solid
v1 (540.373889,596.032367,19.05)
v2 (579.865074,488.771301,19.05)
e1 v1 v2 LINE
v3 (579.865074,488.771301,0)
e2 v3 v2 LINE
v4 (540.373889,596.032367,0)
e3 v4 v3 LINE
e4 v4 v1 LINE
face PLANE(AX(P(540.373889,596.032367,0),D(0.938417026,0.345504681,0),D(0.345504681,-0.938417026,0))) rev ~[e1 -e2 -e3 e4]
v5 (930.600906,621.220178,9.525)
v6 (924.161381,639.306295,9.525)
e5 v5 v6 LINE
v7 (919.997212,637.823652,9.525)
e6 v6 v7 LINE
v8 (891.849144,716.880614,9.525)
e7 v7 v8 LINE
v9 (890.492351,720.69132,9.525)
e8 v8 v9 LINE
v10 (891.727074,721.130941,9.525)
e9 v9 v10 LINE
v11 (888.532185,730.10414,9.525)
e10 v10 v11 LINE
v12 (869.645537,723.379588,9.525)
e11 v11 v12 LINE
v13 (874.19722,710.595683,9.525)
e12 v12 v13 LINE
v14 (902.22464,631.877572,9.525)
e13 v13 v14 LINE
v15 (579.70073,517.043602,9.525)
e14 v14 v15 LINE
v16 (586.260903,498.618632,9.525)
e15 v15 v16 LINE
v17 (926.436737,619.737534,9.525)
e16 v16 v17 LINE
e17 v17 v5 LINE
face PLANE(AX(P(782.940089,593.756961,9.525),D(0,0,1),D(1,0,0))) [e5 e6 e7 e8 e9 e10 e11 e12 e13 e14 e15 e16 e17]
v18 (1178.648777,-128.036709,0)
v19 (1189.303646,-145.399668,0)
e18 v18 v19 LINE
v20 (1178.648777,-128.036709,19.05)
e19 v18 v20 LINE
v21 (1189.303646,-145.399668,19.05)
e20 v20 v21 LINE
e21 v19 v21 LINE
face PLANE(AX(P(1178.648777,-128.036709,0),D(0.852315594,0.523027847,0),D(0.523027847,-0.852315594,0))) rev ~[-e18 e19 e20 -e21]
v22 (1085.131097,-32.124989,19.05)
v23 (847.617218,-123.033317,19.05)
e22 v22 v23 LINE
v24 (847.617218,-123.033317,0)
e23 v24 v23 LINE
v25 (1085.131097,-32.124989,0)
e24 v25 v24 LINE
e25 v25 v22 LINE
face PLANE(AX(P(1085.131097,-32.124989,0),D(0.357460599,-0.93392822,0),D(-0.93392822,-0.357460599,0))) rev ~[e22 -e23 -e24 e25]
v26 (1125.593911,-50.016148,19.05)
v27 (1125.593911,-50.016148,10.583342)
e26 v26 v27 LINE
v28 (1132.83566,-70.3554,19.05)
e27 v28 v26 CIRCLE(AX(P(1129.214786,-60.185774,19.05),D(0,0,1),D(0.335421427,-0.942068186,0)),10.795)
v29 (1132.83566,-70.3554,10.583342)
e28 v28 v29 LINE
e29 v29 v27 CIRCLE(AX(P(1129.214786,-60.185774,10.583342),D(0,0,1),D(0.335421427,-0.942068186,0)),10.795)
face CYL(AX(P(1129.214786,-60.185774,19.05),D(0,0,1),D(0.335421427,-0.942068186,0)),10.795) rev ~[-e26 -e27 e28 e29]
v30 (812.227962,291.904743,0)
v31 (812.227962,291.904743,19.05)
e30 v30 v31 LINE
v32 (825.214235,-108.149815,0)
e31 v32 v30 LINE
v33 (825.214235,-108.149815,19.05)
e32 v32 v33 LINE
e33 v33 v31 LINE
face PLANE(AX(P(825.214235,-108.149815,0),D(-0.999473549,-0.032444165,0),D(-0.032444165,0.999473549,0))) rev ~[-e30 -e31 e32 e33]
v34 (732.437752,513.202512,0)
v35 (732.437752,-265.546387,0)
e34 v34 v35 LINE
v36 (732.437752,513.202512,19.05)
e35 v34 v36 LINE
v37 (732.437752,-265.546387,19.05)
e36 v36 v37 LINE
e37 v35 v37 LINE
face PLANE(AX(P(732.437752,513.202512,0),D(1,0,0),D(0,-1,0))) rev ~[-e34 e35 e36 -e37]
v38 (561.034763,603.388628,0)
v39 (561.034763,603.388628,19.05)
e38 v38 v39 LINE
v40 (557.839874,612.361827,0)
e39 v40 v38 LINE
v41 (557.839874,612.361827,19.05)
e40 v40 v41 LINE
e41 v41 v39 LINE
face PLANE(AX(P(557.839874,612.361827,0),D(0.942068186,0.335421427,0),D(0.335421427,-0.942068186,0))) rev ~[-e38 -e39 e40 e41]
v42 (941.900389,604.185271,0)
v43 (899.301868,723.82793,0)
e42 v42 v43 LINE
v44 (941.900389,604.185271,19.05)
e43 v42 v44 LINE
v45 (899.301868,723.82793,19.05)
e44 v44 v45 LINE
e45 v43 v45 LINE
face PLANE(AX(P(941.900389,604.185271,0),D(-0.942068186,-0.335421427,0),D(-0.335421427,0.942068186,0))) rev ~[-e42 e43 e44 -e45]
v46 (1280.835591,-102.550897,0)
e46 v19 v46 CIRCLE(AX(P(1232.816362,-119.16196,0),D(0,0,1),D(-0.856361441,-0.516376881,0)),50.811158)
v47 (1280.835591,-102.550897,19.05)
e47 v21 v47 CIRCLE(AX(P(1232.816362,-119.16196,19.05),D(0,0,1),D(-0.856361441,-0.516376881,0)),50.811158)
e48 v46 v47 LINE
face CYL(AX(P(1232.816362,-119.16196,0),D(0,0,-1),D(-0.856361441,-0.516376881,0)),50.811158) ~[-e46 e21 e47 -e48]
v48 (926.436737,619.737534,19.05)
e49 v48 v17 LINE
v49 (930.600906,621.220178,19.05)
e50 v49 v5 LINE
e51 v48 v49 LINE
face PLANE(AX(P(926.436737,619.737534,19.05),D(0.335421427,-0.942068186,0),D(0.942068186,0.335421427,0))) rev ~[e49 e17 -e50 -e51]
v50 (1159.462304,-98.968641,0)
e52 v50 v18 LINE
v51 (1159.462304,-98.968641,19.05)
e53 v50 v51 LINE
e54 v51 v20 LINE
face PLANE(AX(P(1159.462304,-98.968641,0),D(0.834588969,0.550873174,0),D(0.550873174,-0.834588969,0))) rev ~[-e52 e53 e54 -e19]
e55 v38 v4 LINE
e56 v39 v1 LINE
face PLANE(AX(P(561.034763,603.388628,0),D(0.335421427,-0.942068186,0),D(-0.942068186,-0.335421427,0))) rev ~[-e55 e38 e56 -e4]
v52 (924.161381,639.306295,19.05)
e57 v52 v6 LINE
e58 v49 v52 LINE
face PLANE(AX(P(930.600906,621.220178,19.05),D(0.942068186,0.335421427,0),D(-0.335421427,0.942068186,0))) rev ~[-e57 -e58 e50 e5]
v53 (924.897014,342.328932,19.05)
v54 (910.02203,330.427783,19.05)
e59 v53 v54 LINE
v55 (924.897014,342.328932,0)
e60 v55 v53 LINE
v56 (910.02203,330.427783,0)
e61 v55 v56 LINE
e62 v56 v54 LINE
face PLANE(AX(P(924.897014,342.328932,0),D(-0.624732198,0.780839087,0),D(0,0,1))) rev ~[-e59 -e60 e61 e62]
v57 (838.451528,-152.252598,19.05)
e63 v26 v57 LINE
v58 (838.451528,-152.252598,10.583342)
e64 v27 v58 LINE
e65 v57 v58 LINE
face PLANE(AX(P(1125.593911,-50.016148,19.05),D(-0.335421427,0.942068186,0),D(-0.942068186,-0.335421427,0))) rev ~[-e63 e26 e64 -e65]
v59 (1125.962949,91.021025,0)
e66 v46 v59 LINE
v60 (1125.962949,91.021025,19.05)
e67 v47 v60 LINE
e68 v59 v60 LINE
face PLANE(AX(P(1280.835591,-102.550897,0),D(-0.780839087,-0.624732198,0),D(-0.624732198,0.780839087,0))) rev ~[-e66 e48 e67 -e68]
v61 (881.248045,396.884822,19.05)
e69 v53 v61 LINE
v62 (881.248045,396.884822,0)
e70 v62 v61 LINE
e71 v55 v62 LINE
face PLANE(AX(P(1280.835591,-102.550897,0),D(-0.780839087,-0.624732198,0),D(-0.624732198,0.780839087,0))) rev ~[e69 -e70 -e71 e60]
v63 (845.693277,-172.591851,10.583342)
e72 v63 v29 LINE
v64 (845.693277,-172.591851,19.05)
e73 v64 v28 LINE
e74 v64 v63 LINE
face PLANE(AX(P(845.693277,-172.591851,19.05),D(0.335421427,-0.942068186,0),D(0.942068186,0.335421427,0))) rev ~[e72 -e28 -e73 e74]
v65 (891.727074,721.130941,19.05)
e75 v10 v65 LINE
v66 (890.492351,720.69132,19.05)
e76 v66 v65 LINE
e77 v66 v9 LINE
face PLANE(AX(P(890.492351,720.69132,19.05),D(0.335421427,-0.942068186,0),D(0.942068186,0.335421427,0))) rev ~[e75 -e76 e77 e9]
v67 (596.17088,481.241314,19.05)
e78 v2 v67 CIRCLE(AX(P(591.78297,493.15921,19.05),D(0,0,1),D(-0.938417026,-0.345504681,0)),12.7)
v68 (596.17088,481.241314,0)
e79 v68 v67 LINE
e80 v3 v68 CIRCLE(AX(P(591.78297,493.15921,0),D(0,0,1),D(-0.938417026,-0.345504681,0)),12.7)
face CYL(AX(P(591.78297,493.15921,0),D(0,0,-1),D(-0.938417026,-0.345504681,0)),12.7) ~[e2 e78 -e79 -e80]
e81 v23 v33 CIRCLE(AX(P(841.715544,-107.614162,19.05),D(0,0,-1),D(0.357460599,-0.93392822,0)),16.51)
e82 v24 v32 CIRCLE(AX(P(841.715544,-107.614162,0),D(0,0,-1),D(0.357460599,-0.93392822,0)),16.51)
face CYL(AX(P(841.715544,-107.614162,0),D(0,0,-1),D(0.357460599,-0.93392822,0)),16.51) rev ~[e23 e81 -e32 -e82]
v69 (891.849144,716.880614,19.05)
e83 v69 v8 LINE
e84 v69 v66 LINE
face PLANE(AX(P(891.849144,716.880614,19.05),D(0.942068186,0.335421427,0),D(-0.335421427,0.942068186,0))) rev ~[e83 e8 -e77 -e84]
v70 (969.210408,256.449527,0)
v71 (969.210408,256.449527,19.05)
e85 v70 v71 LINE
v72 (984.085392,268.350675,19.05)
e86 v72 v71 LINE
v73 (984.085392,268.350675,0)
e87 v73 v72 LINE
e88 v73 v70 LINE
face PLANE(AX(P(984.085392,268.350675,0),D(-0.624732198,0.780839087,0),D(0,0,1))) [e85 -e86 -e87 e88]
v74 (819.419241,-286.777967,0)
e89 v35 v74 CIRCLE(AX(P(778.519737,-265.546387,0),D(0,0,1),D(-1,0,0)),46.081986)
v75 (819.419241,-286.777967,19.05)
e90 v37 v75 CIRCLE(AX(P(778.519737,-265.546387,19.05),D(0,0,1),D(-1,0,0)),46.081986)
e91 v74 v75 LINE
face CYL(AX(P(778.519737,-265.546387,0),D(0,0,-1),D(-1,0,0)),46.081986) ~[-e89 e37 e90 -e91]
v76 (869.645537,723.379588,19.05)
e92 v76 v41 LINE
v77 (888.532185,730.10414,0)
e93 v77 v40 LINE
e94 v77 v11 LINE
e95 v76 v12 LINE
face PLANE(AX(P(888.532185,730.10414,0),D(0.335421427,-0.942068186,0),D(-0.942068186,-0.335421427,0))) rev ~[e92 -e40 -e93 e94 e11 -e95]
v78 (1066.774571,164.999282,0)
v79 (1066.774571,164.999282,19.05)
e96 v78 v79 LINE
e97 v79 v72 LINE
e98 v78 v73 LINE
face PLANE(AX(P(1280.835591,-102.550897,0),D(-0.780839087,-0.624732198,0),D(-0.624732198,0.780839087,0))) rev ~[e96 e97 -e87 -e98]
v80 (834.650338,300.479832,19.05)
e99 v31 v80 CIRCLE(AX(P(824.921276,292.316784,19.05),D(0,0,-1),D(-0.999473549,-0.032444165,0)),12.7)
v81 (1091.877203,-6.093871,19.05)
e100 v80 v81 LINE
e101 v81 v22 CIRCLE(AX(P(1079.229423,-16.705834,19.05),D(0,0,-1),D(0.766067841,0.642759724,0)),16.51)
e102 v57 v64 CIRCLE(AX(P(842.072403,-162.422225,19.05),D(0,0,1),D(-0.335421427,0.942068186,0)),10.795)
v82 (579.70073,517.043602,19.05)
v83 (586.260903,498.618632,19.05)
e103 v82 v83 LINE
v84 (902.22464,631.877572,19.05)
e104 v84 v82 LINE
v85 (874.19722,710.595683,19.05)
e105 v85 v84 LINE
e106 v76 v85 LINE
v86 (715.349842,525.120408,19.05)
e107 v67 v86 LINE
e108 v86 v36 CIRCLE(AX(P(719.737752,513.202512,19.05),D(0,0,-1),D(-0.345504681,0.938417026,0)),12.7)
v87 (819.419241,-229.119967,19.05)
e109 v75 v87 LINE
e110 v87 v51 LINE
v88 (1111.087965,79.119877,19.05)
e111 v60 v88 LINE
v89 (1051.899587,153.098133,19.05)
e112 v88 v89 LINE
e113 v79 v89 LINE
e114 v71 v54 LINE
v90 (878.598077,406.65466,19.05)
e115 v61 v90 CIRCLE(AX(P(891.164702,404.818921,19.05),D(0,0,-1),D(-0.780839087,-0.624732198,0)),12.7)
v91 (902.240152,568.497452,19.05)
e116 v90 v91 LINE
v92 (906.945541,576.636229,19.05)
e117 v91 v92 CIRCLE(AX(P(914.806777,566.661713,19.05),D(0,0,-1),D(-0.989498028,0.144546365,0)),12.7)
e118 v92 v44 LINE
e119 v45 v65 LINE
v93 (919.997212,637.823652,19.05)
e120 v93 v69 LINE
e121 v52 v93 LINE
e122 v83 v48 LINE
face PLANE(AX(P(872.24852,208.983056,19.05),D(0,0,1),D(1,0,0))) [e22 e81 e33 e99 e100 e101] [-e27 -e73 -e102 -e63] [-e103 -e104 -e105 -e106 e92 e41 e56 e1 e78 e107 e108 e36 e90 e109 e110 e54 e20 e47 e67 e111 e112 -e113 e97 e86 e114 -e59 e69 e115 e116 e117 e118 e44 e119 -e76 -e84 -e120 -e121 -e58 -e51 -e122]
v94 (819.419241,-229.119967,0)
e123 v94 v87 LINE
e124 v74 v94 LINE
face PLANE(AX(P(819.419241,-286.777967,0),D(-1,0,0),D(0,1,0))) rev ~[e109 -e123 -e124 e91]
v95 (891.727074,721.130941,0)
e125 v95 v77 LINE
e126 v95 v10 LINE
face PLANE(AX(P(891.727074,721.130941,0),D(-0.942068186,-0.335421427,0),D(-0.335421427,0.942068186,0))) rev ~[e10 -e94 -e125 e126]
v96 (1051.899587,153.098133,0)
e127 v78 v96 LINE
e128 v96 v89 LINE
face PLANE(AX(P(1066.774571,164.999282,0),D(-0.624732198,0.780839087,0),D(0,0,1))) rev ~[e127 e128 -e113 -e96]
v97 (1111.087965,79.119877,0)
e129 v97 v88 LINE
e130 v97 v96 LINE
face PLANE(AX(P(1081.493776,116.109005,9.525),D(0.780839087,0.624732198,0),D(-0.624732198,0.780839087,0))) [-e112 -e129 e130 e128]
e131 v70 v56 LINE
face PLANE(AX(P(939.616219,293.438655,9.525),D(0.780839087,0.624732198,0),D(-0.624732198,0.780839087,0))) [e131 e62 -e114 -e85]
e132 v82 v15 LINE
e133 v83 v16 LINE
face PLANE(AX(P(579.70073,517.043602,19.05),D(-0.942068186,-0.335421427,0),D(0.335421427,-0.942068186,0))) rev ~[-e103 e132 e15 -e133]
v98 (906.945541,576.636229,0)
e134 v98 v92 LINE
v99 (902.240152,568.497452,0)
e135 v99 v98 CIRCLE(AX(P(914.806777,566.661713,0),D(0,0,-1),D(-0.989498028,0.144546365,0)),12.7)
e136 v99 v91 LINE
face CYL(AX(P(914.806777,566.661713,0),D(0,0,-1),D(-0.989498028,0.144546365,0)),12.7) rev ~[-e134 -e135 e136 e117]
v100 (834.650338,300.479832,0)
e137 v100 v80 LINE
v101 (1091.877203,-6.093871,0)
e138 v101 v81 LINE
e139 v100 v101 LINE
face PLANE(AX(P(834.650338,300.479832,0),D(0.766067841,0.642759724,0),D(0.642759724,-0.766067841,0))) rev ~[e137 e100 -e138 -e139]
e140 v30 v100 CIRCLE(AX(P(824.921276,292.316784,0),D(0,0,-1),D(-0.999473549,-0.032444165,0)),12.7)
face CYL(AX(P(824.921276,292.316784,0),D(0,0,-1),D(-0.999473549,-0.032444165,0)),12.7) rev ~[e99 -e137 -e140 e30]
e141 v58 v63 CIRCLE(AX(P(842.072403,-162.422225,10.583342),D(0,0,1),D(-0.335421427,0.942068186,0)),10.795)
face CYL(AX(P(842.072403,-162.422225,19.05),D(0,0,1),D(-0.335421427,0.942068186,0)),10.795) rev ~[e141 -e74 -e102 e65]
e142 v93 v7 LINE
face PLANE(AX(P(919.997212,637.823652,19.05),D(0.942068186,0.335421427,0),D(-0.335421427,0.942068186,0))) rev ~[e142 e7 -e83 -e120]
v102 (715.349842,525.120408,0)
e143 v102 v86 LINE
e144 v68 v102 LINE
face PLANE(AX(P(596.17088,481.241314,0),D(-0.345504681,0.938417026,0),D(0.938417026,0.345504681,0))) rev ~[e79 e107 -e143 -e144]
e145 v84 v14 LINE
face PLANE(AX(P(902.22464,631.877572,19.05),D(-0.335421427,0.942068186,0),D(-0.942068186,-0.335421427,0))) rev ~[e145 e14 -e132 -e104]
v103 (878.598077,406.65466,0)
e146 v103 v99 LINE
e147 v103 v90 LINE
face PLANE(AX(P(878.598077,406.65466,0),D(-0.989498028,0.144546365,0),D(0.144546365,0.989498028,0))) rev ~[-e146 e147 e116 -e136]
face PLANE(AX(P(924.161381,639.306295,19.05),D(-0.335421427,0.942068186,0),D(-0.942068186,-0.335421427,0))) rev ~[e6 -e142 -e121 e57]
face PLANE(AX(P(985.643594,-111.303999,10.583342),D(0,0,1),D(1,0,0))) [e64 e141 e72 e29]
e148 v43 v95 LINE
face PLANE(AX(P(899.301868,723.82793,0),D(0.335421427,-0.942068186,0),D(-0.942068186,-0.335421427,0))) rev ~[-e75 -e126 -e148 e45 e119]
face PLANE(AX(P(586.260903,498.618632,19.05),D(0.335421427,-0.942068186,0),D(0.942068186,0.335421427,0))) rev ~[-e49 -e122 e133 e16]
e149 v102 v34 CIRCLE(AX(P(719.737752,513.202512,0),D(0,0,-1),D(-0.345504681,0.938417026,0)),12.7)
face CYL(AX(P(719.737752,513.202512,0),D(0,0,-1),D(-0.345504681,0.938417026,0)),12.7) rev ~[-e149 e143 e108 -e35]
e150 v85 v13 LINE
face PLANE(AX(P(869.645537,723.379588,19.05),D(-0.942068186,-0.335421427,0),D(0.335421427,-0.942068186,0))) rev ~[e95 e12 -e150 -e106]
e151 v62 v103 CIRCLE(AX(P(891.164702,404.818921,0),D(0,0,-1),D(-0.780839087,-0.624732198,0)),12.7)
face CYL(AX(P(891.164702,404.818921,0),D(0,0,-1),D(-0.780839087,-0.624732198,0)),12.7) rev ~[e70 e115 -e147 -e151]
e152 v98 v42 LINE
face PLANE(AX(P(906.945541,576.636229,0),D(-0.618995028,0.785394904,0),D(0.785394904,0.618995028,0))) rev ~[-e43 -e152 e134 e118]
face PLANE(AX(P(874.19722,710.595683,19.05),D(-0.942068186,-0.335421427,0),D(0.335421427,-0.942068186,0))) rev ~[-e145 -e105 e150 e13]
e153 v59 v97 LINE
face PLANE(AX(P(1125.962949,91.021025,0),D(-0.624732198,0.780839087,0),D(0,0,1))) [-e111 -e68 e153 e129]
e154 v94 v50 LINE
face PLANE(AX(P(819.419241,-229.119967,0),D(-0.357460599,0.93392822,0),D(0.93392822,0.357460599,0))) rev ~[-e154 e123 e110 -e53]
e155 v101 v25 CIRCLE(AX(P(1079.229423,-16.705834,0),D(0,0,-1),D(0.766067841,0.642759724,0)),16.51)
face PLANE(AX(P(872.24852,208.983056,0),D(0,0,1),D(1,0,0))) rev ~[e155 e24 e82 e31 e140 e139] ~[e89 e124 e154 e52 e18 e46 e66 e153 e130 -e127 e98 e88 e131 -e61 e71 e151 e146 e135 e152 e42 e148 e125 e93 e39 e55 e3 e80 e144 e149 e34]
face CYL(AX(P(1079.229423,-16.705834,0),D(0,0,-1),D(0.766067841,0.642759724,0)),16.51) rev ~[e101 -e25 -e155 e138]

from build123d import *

# Parameters (mm, degrees)
F1_DEPTH = 19.05
F3_DEPTH = 8.4666582
F5_DEPTH = 9.525
F6_W     = 94.742
F6_H     = 19.05
F7_DEPTH = 19.05


# Not quite as in the source:
# - a feature names something its author has since deleted; it is built from what else it names


with BuildPart() as f1:
    # F0 (on Top) → F1 (new body)
    with BuildSketch(Plane.XY):
        with BuildLine():
            Line((732.4377516272, 429.8118038565), (732.4377516272, -265.5463867273))
            ThreePointArc((732.4377516272, -265.5463867273), (767.5922703415, -310.3140075425), (819.4192408881, -286.7779674454))
            Line((819.4192408881, -286.7779674454), (819.4192408881, -229.1199674454))
            Line((819.4192408881, -229.1199674454), (1159.4623036636, -98.9686407408))
            Line((1159.4623036636, -98.9686407408), (1178.6487772739, -128.0367093729))
            Line((1178.6487772739, -128.0367093729), (1189.3036458742, -145.3996676047))
            ThreePointArc((1189.3036458742, -145.3996676047), (1254.3589120262, -165.180351508), (1280.8355912672, -102.5508970465))
            Line((1280.8355912672, -102.5508970465), (881.2480453078, 396.8848219998))
            ThreePointArc((881.2480453078, 396.8848219998), (878.9075846932, 401.4943033077), (878.5980767553, 406.6546597539))
            Line((878.5980767553, 406.6546597539), (902.2401524871, 568.497452094))
            ThreePointArc((902.2401524871, 568.497452094), (903.8120375637, 573.0182606597), (906.9455405898, 576.6362285378))
            Line((906.9455405898, 576.6362285378), (941.9003890149, 604.1852707886))
            Line((941.9003890149, 604.1852707886), (899.3018677789, 723.8279303566))
            Line((899.3018677789, 723.8279303566), (891.7270738587, 721.1309406639))
            Line((891.7270738587, 721.1309406639), (888.532184766, 730.1041401315))
            Line((888.532184766, 730.1041401315), (557.8398737201, 612.361827435))
            Line((557.8398737201, 612.361827435), (561.0347628128, 603.3886279674))
            Line((561.0347628128, 603.3886279674), (540.3738890749, 596.0323666485))
            Line((540.3738890749, 596.0323666485), (579.8650741531, 488.7713005475))
            ThreePointArc((579.8650741531, 488.7713005475), (586.4584656719, 481.6292642269), (596.1708798397, 481.2413137672))
            Line((596.1708798397, 481.2413137672), (715.3498421741, 525.1204082985))
            ThreePointArc((715.3498421741, 525.1204082985), (727.0028583004, 523.6192401995), (732.4377516272, 513.202512065))
            Line((732.4377516272, 513.202512065), (732.4377516272, 429.8118038565))
        make_face()
        with BuildLine():
            ThreePointArc((847.6172180507, -123.0333171416), (832.579476833, -121.3659760987), (825.2142352601, -108.1498153983))
            Line((825.2142352601, -108.1498153983), (812.2279623998, 291.9047427935))
            ThreePointArc((812.2279623998, 291.9047427935), (820.3847868922, 304.1789193457), (834.6503380579, 300.4798321914))
            Line((834.6503380579, 300.4798321914), (1091.877202569, -6.0938706764))
            ThreePointArc((1091.877202569, -6.0938706764), (1095.2114543488, -20.8476640537), (1085.1310970041, -32.1249886369))
            Line((1085.1310970041, -32.1249886369), (847.6172180507, -123.0333171416))
        make_face(mode=Mode.SUBTRACT)
    extrude(amount=F1_DEPTH)

    # F2 (on face) → F3 (cut)
    with BuildSketch(Plane.XY.offset(19.05)):
        with BuildLine():
            ThreePointArc((838.451528287, -152.2525984903), (831.9027765287, -166.0430988586), (845.6932768971, -172.5918506169))
            Line((845.6932768971, -172.5918506169), (1132.8356598603, -70.3553996504))
            ThreePointArc((1132.8356598603, -70.3553996504), (1139.3844116185, -56.564899282), (1125.5939112501, -50.0161475238))
            Line((1125.5939112501, -50.0161475238), (838.451528287, -152.2525984903))
        make_face()
    extrude(amount=-F3_DEPTH, mode=Mode.SUBTRACT)

    # F4 (on face) → F5 (cut)
    with BuildSketch(Plane.XY.offset(19.05)):
        Polygon((579.7007303012, 517.0436017545), (586.2609025716, 498.618632181), (926.4367371726, 619.7375338049), (930.6009060633, 621.2201775171), (924.161381266, 639.3062953154), (919.9972123753, 637.8236516032), (891.8491444715, 716.8806143331), (890.4923506062, 720.6913200061), (891.7270738587, 721.1309406639), (888.532184766, 730.1041401315), (869.645537074, 723.3795883228), (874.197220032, 710.5956831823), (902.2246404628, 631.8775722275), align=None)
    extrude(amount=-F5_DEPTH, mode=Mode.SUBTRACT)

    # F6 (on face) → F7 (cut)
    with BuildSketch(Plane(origin=(730.9119602838, 584.7866009261, 0), x_dir=(-0.6247321984, 0.7808390873, 0), z_dir=(0.7808390873, 0.6247321984, 0))):
        with Locations((-357.880134458, 9.525)):
            Rectangle(F6_W, F6_H)
        with Locations((-584.981534458, 9.525)):
            Rectangle(F6_W, F6_H)
    extrude(amount=-F7_DEPTH, mode=Mode.SUBTRACT)


solid = f1.part
